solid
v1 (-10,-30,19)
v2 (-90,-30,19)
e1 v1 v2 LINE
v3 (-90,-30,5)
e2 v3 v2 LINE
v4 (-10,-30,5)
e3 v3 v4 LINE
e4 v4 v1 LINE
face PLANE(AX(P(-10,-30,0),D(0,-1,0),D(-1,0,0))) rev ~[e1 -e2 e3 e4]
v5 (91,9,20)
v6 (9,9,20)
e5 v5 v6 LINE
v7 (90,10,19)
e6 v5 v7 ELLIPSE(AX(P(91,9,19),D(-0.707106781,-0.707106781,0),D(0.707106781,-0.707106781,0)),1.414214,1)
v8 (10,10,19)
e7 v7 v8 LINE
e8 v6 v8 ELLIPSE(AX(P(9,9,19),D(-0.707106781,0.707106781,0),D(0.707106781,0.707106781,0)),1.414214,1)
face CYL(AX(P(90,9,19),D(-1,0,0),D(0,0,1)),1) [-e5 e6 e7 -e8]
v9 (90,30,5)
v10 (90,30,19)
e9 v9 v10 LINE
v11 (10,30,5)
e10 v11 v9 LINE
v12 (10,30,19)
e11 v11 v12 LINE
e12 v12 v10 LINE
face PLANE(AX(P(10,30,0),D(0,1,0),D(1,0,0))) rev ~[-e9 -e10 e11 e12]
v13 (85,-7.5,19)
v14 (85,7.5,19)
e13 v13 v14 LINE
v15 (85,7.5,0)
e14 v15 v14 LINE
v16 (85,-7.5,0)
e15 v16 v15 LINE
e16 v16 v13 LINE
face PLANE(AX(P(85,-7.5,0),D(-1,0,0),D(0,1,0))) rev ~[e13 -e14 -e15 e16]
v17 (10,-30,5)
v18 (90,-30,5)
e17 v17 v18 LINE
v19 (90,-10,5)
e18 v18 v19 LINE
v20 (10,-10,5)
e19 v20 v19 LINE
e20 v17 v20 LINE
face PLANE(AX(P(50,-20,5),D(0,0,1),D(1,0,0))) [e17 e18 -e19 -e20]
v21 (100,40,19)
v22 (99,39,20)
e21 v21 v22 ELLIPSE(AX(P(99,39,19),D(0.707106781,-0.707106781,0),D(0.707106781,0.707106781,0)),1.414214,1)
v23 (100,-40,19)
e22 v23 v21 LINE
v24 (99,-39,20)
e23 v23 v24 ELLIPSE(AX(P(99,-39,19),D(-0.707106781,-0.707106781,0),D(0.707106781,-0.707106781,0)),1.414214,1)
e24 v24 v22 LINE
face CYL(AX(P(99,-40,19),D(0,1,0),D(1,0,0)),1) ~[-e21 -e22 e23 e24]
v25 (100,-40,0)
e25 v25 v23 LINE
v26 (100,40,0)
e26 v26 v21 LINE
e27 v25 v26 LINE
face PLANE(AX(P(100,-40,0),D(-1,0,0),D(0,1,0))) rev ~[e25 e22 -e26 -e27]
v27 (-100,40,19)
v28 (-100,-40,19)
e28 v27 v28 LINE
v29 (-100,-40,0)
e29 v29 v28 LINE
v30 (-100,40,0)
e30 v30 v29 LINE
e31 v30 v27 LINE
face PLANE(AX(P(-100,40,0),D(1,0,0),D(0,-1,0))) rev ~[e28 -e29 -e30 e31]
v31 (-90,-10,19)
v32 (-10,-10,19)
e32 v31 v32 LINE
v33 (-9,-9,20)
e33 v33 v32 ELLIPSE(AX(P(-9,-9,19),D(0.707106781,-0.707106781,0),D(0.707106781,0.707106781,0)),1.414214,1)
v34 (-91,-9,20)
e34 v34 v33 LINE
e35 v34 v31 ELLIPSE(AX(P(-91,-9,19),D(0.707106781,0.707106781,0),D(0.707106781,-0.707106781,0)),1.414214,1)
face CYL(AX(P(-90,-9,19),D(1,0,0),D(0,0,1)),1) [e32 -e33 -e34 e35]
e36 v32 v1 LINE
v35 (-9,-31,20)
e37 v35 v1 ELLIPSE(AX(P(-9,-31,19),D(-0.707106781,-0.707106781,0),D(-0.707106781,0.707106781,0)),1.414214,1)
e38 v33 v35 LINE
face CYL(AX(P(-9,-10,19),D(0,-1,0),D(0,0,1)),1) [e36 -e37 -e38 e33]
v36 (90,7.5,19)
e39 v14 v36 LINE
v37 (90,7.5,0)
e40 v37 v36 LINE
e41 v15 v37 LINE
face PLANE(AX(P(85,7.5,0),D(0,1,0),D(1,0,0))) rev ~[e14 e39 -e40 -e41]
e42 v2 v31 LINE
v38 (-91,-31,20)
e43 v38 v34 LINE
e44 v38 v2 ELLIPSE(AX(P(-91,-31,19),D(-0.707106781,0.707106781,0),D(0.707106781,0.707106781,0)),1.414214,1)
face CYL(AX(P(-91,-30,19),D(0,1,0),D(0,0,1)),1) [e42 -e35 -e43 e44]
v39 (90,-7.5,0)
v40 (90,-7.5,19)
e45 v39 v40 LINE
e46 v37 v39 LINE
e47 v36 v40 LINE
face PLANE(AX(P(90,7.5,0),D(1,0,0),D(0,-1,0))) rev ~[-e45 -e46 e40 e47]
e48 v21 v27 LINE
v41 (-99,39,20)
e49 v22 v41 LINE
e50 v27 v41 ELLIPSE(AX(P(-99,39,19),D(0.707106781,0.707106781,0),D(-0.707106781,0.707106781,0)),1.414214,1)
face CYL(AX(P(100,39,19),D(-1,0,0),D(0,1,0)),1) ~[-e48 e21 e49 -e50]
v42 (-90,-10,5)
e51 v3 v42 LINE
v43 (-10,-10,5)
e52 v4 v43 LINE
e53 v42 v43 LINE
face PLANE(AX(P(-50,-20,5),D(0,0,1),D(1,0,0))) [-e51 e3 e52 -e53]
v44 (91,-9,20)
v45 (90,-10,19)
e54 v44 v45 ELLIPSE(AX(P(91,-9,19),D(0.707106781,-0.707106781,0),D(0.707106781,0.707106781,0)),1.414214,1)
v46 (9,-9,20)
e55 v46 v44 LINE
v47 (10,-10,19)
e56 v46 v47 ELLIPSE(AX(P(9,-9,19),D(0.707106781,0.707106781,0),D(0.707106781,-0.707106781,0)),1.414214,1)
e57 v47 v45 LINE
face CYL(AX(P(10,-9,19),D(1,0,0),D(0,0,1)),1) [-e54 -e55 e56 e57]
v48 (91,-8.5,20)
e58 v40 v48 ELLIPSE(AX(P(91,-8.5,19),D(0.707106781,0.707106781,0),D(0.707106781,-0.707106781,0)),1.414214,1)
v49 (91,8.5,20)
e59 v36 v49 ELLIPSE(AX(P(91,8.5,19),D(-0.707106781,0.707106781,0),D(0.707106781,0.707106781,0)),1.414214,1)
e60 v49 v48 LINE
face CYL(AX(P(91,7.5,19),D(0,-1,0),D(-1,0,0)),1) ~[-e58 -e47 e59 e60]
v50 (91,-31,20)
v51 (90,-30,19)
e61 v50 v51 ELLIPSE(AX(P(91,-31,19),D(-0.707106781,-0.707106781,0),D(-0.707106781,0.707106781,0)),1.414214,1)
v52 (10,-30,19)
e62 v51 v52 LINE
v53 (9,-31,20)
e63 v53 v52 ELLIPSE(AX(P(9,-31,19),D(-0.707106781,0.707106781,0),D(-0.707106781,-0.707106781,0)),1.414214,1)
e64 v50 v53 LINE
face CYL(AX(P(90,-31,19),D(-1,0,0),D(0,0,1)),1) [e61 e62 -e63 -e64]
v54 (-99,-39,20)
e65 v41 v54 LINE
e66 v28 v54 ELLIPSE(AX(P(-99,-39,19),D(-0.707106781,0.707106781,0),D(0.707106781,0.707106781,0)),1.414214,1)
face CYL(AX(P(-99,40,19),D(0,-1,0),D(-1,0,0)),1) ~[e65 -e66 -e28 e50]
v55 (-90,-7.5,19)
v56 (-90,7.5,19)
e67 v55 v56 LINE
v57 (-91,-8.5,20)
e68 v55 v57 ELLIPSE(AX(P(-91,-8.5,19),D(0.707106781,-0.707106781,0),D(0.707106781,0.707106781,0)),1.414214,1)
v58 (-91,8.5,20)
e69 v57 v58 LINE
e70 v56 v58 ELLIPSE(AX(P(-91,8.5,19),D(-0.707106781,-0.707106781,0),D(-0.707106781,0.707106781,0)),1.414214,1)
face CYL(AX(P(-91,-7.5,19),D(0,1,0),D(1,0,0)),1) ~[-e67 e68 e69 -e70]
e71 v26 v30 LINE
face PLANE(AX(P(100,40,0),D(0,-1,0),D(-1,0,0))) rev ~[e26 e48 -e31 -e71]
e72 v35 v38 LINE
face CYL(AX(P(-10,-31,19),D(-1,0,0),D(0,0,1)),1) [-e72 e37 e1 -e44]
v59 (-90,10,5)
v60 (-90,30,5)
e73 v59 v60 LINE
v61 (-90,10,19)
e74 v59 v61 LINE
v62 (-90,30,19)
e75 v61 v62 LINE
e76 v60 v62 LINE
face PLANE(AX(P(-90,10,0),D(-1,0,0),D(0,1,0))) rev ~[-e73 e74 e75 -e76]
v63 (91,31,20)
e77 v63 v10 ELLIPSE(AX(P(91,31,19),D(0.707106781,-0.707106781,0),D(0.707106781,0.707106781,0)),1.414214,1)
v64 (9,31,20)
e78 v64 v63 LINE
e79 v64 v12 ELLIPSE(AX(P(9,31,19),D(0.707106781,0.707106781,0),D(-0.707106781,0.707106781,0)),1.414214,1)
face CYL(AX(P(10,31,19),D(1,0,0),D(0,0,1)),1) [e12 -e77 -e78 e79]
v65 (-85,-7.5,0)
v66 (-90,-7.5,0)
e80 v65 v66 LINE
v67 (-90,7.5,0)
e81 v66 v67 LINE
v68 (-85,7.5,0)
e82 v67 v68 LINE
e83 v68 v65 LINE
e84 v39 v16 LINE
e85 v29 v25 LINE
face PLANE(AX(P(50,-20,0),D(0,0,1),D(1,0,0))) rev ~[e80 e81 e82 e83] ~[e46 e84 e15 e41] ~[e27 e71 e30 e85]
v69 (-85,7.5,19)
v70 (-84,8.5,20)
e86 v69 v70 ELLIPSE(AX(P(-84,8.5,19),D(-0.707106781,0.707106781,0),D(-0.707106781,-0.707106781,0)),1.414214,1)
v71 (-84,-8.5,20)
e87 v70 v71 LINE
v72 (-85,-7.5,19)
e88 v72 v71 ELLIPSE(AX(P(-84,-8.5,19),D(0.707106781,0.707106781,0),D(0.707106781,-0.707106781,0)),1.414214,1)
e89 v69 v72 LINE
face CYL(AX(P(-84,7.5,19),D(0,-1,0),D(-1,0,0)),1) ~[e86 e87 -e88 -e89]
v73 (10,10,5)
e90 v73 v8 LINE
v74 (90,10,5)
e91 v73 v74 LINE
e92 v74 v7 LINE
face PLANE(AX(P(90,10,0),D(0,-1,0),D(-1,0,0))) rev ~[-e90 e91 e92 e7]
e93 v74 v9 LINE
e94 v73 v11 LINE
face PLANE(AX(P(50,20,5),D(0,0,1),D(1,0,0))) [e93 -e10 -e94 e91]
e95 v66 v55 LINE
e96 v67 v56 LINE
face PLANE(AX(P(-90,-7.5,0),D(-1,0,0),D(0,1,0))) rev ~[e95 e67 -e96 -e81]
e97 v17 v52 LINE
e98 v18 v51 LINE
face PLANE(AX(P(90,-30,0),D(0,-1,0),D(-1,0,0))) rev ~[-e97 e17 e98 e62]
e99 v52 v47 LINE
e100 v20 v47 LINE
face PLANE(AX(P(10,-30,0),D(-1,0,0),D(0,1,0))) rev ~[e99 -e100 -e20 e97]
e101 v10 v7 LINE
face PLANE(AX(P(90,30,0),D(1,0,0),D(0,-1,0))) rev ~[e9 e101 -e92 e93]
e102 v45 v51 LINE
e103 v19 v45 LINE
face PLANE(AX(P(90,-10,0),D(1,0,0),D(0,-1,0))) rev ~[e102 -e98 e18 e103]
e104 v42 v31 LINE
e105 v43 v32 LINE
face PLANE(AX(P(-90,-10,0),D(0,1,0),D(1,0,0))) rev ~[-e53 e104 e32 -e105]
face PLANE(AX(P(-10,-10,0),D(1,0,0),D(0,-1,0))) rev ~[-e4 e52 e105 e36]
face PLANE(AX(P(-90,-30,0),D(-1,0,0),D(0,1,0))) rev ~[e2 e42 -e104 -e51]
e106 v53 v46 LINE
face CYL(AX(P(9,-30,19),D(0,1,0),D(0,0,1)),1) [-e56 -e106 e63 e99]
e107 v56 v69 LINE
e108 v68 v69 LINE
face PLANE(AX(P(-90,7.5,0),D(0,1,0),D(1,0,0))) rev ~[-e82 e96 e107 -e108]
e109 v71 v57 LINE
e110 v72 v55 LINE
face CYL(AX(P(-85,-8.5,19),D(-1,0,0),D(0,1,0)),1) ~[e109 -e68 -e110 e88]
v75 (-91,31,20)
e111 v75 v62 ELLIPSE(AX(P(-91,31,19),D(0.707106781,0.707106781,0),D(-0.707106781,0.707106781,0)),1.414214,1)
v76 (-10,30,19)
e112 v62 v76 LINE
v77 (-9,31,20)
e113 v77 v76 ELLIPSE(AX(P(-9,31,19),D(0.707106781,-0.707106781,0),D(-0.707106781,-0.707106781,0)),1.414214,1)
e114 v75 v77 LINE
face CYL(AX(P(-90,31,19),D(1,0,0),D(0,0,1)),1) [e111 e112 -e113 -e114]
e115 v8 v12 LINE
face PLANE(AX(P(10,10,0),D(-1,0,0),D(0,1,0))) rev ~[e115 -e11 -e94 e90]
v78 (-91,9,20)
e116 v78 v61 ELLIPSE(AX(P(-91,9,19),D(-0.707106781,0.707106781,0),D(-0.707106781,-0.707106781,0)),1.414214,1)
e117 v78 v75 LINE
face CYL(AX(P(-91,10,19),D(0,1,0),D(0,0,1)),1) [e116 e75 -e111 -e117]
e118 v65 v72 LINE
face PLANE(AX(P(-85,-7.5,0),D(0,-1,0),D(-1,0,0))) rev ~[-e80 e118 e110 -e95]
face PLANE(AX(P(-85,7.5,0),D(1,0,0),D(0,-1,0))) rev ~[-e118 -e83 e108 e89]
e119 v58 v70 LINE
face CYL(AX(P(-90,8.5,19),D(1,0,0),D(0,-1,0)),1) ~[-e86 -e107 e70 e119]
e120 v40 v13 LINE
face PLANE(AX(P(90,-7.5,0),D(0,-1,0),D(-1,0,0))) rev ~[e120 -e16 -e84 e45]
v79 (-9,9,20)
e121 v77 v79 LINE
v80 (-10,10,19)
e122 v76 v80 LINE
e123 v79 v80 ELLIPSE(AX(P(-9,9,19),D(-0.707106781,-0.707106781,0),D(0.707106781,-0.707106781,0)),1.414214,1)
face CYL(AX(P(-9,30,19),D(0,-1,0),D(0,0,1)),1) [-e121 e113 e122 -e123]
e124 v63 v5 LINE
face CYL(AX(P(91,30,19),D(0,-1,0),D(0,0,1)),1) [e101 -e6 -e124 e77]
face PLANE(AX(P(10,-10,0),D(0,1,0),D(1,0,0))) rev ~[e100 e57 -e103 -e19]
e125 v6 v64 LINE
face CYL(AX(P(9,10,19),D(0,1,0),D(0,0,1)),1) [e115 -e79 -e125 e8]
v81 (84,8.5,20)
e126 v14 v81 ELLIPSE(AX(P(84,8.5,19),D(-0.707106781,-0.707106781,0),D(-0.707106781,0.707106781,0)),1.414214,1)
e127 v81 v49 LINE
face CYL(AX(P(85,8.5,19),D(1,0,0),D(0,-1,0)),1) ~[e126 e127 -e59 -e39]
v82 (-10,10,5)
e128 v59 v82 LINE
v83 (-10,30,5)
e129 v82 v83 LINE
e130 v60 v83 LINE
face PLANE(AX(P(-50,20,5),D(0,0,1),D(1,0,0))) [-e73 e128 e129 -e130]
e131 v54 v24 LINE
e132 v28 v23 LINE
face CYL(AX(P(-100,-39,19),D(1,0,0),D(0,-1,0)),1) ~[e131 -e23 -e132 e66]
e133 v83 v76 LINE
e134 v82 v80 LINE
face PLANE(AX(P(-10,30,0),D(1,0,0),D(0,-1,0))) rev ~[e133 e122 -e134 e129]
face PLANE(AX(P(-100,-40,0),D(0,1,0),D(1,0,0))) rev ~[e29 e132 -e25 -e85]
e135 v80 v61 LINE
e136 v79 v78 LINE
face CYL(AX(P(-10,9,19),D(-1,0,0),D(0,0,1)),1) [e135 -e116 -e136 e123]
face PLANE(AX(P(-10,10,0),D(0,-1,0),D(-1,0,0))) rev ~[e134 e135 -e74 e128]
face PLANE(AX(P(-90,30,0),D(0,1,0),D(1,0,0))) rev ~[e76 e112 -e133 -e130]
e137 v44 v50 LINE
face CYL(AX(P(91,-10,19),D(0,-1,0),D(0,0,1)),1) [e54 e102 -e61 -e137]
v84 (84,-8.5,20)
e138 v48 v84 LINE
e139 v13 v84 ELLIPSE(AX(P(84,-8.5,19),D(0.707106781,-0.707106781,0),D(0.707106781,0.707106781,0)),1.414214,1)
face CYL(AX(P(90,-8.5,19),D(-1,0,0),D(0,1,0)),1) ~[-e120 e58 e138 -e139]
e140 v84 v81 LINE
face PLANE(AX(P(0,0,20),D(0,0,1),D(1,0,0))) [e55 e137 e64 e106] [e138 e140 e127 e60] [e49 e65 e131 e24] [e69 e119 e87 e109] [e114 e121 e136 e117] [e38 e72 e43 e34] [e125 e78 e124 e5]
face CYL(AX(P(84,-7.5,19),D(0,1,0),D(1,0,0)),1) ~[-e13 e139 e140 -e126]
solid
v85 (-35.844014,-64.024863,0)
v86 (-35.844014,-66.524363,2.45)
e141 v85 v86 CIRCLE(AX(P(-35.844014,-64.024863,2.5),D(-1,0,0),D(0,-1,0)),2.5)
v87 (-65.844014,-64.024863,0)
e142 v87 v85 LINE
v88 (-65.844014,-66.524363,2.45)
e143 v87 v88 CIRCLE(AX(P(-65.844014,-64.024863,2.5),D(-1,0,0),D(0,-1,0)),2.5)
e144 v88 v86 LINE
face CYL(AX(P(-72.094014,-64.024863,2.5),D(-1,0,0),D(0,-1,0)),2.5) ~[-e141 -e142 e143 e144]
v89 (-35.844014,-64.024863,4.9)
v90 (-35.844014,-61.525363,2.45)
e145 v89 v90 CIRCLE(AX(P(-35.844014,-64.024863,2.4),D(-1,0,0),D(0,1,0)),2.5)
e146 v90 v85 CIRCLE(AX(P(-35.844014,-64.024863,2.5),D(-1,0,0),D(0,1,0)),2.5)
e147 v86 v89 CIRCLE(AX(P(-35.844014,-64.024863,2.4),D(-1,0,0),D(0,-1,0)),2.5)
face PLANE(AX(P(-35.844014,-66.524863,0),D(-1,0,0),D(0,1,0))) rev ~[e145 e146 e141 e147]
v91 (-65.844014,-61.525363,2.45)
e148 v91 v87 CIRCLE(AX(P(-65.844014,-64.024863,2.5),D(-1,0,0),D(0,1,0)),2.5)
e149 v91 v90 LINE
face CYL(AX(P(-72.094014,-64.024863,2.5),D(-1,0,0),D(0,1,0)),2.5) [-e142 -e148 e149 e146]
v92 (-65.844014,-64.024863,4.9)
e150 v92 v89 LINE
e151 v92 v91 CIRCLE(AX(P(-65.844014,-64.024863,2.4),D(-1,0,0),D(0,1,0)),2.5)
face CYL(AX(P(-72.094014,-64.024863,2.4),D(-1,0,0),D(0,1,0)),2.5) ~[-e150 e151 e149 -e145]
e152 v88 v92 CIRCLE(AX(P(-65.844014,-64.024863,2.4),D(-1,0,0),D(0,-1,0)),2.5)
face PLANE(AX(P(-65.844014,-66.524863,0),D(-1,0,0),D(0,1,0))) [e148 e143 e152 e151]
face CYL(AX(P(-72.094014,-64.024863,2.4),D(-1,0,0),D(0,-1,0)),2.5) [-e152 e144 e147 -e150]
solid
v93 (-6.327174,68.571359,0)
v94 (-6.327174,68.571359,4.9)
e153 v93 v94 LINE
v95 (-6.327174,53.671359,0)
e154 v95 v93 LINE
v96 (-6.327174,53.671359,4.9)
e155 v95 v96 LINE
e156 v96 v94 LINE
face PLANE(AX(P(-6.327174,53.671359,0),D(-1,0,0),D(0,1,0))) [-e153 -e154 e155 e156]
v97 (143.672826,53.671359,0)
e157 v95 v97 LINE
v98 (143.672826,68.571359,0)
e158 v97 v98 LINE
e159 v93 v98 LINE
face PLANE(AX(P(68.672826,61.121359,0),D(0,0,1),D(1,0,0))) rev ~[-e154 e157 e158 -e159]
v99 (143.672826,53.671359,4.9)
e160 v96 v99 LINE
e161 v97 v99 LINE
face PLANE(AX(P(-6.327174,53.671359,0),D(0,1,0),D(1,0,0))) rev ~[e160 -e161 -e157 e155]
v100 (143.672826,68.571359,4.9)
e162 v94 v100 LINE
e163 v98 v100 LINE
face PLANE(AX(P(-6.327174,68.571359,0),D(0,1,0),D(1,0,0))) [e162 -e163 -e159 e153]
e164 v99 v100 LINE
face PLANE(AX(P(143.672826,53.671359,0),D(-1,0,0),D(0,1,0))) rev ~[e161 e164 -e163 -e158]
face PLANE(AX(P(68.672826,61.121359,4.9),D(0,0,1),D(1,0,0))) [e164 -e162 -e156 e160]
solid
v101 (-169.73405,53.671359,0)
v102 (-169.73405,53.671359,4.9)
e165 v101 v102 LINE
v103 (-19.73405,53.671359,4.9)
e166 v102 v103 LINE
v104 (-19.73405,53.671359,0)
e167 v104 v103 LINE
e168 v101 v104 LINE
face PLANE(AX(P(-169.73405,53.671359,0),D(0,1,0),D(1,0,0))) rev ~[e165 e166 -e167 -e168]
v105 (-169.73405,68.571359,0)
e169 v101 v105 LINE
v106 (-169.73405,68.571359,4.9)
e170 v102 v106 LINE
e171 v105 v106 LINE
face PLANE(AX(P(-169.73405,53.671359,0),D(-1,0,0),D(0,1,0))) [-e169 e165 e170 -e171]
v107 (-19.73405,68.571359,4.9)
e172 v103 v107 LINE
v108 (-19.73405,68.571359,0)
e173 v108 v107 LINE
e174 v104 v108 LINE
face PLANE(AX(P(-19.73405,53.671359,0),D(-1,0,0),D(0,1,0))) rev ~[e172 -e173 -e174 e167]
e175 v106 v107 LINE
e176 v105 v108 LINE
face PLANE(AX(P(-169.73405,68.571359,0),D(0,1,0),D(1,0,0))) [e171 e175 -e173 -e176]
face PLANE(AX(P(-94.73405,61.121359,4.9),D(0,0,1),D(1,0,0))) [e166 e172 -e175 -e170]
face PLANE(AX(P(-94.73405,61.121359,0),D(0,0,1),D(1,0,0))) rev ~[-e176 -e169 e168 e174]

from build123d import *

# Parameters (mm, degrees)
F0_W        = 10
F0_H        = 10
F1_DEPTH    = 20
F0_W_2      = 80
F0_H_2      = 20
F2_DEPTH    = 5
F3_DEPTH    = 5
F4_DEPTH    = 5
F5_DEPTH    = 5
F6_W        = 150
F6_H        = 14.9
F7_DEPTH    = 4.9
F6_W_2      = 30
F6_H_2      = 5
F8_R        = 1
F9_T1_DEPTH = 42.5


# Not quite as in the source:
# - a fillet or chamfer that OpenCascade refuses, or shapes differently, is made with other operations: its cross-section is extruded or revolved along the edge and cut away or added


with BuildPart() as f1:
    # F0 (on Top) → F1 (new body)
    with BuildSketch(Plane.XY):
        Polygon((10, 10), (10, 30), (-10, 30), (-10, 10), (-90, 10), (-90, 7.5), (-85, 7.5), (-85, -7.5), (-90, -7.5), (-90, -10), (-10, -10), (-10, -30), (10, -30), (10, -10), (90, -10), (90, -7.5), (85, -7.5), (85, 7.5), (90, 7.5), (90, 10), align=None)
        Polygon((-90, 10), (-90, 30), (-100, 30), (-100, -30), (-90, -30), (-90, -10), (-90, -7.5), (-90, 7.5), align=None)
        with Locations((-95, -35)):
            Rectangle(F0_W, F0_H)
        Polygon((90, -40), (90, -30), (10, -30), (-10, -30), (-90, -30), (-90, -40), align=None)
        with Locations((-95, 35)):
            Rectangle(F0_W, F0_H)
        Polygon((90, 30), (90, 40), (-90, 40), (-90, 30), (-10, 30), (10, 30), align=None)
        with Locations((95, 35)):
            Rectangle(F0_W, F0_H)
        Polygon((100, -30), (100, 30), (90, 30), (90, 10), (90, 7.5), (90, -7.5), (90, -10), (90, -30), align=None)
        with Locations((95, -35)):
            Rectangle(F0_W, F0_H)
    extrude(amount=F1_DEPTH)

    # F0 (on Top) → F2 (join)
    with BuildSketch(Plane.XY):
        with Locations((-50, 20)):
            Rectangle(F0_W_2, F0_H_2)
    extrude(amount=F2_DEPTH)

    # F0 (on Top) → F3 (join)
    with BuildSketch(Plane.XY):
        with Locations((-50, -20)):
            Rectangle(F0_W_2, F0_H_2)
    extrude(amount=F3_DEPTH)

    # F0 (on Top) → F4 (join)
    with BuildSketch(Plane.XY):
        with Locations((50, 20)):
            Rectangle(F0_W_2, F0_H_2)
    extrude(amount=F4_DEPTH)

    # F0 (on Top) → F5 (join)
    with BuildSketch(Plane.XY):
        with Locations((50, -20)):
            Rectangle(F0_W_2, F0_H_2)
    extrude(amount=F5_DEPTH)

    # F8
    f8_edges = [f1.edges().sort_by_distance(p)[0] for p in [
        (-90, 0, 20),
        (-85, 0, 20),
        (-87.5, 7.5, 20),
        (-87.5, -7.5, 20),
        (85, 0, 20),
        (87.5, 7.5, 20),
        (90, 0, 20),
        (87.5, -7.5, 20),
        (-50, -10, 20),
        (-90, -20, 20),
        (-50, -30, 20),
        (50, -30, 20),
        (-10, -20, 20),
        (50, -10, 20),
        (10, -20, 20),
        (90, -20, 20),
        (0, -40, 20),
        (100, 0, 20),
        (0, 40, 20),
        (-100, 0, 20),
        (-10, 20, 20),
        (-50, 10, 20),
        (-90, 20, 20),
        (-50, 30, 20),
        (10, 20, 20),
        (50, 30, 20),
        (90, 20, 20),
        (50, 10, 20),
    ]]
    fillet(f8_edges, radius=F8_R)


with BuildPart() as f7:
    # F6 (on Top) → F7 (new body)
    with BuildSketch(Plane.XY):
        with Locations((-94.7340503335, 61.1213589191)):
            Rectangle(F6_W, F6_H)
    extrude(amount=F7_DEPTH)


with BuildPart() as f7b:
    # F6 (on Top) → F7, piece 2 (new body)
    with BuildSketch(Plane.XY):
        with Locations((68.6728258617, 61.1213589191)):
            Rectangle(F6_W, F6_H)
    extrude(amount=F7_DEPTH)


with BuildPart() as f7c:
    # F6 (on Top) → F7, piece 3 (new body)
    with BuildSketch(Plane.XY):
        with Locations((-50.844014287, -64.0248632431)):
            Rectangle(F6_W_2, F6_H_2)
    extrude(amount=F7_DEPTH)

    # F9: fillet of radius 2.5 on 4 edges, made by hand

    # F9_s2 → F9_t1 (cut)
    with BuildSketch(Plane.YZ.offset(-72.094014287)):
        with BuildLine():
            ThreePointArc((-66.5248632431, 2.4), (-65.7926301961, 4.167766953), (-64.0248632431, 4.9))
            Line((-64.0248632431, 4.9), (-66.5248632431, 4.9))
            Line((-66.5248632431, 4.9), (-66.5248632431, 2.4))
        make_face()
        with BuildLine():
            ThreePointArc((-61.5248632431, 2.4), (-62.2570962901, 4.167766953), (-64.0248632431, 4.9))
            Line((-64.0248632431, 4.9), (-61.5248632431, 4.9))
            Line((-61.5248632431, 4.9), (-61.5248632431, 2.4))
        make_face()
        with BuildLine():
            ThreePointArc((-66.5248632431, 2.5), (-65.7926301961, 0.732233047), (-64.0248632431, 0))
            Line((-64.0248632431, 0), (-66.5248632431, 0))
            Line((-66.5248632431, 0), (-66.5248632431, 2.5))
        make_face()
        with BuildLine():
            ThreePointArc((-61.5248632431, 2.5), (-62.2570962901, 0.732233047), (-64.0248632431, 0))
            Line((-64.0248632431, 0), (-61.5248632431, 0))
            Line((-61.5248632431, 0), (-61.5248632431, 2.5))
        make_face()
    extrude(amount=F9_T1_DEPTH, mode=Mode.SUBTRACT)


solid = Compound([f1.part, f7.part, f7b.part, f7c.part])
